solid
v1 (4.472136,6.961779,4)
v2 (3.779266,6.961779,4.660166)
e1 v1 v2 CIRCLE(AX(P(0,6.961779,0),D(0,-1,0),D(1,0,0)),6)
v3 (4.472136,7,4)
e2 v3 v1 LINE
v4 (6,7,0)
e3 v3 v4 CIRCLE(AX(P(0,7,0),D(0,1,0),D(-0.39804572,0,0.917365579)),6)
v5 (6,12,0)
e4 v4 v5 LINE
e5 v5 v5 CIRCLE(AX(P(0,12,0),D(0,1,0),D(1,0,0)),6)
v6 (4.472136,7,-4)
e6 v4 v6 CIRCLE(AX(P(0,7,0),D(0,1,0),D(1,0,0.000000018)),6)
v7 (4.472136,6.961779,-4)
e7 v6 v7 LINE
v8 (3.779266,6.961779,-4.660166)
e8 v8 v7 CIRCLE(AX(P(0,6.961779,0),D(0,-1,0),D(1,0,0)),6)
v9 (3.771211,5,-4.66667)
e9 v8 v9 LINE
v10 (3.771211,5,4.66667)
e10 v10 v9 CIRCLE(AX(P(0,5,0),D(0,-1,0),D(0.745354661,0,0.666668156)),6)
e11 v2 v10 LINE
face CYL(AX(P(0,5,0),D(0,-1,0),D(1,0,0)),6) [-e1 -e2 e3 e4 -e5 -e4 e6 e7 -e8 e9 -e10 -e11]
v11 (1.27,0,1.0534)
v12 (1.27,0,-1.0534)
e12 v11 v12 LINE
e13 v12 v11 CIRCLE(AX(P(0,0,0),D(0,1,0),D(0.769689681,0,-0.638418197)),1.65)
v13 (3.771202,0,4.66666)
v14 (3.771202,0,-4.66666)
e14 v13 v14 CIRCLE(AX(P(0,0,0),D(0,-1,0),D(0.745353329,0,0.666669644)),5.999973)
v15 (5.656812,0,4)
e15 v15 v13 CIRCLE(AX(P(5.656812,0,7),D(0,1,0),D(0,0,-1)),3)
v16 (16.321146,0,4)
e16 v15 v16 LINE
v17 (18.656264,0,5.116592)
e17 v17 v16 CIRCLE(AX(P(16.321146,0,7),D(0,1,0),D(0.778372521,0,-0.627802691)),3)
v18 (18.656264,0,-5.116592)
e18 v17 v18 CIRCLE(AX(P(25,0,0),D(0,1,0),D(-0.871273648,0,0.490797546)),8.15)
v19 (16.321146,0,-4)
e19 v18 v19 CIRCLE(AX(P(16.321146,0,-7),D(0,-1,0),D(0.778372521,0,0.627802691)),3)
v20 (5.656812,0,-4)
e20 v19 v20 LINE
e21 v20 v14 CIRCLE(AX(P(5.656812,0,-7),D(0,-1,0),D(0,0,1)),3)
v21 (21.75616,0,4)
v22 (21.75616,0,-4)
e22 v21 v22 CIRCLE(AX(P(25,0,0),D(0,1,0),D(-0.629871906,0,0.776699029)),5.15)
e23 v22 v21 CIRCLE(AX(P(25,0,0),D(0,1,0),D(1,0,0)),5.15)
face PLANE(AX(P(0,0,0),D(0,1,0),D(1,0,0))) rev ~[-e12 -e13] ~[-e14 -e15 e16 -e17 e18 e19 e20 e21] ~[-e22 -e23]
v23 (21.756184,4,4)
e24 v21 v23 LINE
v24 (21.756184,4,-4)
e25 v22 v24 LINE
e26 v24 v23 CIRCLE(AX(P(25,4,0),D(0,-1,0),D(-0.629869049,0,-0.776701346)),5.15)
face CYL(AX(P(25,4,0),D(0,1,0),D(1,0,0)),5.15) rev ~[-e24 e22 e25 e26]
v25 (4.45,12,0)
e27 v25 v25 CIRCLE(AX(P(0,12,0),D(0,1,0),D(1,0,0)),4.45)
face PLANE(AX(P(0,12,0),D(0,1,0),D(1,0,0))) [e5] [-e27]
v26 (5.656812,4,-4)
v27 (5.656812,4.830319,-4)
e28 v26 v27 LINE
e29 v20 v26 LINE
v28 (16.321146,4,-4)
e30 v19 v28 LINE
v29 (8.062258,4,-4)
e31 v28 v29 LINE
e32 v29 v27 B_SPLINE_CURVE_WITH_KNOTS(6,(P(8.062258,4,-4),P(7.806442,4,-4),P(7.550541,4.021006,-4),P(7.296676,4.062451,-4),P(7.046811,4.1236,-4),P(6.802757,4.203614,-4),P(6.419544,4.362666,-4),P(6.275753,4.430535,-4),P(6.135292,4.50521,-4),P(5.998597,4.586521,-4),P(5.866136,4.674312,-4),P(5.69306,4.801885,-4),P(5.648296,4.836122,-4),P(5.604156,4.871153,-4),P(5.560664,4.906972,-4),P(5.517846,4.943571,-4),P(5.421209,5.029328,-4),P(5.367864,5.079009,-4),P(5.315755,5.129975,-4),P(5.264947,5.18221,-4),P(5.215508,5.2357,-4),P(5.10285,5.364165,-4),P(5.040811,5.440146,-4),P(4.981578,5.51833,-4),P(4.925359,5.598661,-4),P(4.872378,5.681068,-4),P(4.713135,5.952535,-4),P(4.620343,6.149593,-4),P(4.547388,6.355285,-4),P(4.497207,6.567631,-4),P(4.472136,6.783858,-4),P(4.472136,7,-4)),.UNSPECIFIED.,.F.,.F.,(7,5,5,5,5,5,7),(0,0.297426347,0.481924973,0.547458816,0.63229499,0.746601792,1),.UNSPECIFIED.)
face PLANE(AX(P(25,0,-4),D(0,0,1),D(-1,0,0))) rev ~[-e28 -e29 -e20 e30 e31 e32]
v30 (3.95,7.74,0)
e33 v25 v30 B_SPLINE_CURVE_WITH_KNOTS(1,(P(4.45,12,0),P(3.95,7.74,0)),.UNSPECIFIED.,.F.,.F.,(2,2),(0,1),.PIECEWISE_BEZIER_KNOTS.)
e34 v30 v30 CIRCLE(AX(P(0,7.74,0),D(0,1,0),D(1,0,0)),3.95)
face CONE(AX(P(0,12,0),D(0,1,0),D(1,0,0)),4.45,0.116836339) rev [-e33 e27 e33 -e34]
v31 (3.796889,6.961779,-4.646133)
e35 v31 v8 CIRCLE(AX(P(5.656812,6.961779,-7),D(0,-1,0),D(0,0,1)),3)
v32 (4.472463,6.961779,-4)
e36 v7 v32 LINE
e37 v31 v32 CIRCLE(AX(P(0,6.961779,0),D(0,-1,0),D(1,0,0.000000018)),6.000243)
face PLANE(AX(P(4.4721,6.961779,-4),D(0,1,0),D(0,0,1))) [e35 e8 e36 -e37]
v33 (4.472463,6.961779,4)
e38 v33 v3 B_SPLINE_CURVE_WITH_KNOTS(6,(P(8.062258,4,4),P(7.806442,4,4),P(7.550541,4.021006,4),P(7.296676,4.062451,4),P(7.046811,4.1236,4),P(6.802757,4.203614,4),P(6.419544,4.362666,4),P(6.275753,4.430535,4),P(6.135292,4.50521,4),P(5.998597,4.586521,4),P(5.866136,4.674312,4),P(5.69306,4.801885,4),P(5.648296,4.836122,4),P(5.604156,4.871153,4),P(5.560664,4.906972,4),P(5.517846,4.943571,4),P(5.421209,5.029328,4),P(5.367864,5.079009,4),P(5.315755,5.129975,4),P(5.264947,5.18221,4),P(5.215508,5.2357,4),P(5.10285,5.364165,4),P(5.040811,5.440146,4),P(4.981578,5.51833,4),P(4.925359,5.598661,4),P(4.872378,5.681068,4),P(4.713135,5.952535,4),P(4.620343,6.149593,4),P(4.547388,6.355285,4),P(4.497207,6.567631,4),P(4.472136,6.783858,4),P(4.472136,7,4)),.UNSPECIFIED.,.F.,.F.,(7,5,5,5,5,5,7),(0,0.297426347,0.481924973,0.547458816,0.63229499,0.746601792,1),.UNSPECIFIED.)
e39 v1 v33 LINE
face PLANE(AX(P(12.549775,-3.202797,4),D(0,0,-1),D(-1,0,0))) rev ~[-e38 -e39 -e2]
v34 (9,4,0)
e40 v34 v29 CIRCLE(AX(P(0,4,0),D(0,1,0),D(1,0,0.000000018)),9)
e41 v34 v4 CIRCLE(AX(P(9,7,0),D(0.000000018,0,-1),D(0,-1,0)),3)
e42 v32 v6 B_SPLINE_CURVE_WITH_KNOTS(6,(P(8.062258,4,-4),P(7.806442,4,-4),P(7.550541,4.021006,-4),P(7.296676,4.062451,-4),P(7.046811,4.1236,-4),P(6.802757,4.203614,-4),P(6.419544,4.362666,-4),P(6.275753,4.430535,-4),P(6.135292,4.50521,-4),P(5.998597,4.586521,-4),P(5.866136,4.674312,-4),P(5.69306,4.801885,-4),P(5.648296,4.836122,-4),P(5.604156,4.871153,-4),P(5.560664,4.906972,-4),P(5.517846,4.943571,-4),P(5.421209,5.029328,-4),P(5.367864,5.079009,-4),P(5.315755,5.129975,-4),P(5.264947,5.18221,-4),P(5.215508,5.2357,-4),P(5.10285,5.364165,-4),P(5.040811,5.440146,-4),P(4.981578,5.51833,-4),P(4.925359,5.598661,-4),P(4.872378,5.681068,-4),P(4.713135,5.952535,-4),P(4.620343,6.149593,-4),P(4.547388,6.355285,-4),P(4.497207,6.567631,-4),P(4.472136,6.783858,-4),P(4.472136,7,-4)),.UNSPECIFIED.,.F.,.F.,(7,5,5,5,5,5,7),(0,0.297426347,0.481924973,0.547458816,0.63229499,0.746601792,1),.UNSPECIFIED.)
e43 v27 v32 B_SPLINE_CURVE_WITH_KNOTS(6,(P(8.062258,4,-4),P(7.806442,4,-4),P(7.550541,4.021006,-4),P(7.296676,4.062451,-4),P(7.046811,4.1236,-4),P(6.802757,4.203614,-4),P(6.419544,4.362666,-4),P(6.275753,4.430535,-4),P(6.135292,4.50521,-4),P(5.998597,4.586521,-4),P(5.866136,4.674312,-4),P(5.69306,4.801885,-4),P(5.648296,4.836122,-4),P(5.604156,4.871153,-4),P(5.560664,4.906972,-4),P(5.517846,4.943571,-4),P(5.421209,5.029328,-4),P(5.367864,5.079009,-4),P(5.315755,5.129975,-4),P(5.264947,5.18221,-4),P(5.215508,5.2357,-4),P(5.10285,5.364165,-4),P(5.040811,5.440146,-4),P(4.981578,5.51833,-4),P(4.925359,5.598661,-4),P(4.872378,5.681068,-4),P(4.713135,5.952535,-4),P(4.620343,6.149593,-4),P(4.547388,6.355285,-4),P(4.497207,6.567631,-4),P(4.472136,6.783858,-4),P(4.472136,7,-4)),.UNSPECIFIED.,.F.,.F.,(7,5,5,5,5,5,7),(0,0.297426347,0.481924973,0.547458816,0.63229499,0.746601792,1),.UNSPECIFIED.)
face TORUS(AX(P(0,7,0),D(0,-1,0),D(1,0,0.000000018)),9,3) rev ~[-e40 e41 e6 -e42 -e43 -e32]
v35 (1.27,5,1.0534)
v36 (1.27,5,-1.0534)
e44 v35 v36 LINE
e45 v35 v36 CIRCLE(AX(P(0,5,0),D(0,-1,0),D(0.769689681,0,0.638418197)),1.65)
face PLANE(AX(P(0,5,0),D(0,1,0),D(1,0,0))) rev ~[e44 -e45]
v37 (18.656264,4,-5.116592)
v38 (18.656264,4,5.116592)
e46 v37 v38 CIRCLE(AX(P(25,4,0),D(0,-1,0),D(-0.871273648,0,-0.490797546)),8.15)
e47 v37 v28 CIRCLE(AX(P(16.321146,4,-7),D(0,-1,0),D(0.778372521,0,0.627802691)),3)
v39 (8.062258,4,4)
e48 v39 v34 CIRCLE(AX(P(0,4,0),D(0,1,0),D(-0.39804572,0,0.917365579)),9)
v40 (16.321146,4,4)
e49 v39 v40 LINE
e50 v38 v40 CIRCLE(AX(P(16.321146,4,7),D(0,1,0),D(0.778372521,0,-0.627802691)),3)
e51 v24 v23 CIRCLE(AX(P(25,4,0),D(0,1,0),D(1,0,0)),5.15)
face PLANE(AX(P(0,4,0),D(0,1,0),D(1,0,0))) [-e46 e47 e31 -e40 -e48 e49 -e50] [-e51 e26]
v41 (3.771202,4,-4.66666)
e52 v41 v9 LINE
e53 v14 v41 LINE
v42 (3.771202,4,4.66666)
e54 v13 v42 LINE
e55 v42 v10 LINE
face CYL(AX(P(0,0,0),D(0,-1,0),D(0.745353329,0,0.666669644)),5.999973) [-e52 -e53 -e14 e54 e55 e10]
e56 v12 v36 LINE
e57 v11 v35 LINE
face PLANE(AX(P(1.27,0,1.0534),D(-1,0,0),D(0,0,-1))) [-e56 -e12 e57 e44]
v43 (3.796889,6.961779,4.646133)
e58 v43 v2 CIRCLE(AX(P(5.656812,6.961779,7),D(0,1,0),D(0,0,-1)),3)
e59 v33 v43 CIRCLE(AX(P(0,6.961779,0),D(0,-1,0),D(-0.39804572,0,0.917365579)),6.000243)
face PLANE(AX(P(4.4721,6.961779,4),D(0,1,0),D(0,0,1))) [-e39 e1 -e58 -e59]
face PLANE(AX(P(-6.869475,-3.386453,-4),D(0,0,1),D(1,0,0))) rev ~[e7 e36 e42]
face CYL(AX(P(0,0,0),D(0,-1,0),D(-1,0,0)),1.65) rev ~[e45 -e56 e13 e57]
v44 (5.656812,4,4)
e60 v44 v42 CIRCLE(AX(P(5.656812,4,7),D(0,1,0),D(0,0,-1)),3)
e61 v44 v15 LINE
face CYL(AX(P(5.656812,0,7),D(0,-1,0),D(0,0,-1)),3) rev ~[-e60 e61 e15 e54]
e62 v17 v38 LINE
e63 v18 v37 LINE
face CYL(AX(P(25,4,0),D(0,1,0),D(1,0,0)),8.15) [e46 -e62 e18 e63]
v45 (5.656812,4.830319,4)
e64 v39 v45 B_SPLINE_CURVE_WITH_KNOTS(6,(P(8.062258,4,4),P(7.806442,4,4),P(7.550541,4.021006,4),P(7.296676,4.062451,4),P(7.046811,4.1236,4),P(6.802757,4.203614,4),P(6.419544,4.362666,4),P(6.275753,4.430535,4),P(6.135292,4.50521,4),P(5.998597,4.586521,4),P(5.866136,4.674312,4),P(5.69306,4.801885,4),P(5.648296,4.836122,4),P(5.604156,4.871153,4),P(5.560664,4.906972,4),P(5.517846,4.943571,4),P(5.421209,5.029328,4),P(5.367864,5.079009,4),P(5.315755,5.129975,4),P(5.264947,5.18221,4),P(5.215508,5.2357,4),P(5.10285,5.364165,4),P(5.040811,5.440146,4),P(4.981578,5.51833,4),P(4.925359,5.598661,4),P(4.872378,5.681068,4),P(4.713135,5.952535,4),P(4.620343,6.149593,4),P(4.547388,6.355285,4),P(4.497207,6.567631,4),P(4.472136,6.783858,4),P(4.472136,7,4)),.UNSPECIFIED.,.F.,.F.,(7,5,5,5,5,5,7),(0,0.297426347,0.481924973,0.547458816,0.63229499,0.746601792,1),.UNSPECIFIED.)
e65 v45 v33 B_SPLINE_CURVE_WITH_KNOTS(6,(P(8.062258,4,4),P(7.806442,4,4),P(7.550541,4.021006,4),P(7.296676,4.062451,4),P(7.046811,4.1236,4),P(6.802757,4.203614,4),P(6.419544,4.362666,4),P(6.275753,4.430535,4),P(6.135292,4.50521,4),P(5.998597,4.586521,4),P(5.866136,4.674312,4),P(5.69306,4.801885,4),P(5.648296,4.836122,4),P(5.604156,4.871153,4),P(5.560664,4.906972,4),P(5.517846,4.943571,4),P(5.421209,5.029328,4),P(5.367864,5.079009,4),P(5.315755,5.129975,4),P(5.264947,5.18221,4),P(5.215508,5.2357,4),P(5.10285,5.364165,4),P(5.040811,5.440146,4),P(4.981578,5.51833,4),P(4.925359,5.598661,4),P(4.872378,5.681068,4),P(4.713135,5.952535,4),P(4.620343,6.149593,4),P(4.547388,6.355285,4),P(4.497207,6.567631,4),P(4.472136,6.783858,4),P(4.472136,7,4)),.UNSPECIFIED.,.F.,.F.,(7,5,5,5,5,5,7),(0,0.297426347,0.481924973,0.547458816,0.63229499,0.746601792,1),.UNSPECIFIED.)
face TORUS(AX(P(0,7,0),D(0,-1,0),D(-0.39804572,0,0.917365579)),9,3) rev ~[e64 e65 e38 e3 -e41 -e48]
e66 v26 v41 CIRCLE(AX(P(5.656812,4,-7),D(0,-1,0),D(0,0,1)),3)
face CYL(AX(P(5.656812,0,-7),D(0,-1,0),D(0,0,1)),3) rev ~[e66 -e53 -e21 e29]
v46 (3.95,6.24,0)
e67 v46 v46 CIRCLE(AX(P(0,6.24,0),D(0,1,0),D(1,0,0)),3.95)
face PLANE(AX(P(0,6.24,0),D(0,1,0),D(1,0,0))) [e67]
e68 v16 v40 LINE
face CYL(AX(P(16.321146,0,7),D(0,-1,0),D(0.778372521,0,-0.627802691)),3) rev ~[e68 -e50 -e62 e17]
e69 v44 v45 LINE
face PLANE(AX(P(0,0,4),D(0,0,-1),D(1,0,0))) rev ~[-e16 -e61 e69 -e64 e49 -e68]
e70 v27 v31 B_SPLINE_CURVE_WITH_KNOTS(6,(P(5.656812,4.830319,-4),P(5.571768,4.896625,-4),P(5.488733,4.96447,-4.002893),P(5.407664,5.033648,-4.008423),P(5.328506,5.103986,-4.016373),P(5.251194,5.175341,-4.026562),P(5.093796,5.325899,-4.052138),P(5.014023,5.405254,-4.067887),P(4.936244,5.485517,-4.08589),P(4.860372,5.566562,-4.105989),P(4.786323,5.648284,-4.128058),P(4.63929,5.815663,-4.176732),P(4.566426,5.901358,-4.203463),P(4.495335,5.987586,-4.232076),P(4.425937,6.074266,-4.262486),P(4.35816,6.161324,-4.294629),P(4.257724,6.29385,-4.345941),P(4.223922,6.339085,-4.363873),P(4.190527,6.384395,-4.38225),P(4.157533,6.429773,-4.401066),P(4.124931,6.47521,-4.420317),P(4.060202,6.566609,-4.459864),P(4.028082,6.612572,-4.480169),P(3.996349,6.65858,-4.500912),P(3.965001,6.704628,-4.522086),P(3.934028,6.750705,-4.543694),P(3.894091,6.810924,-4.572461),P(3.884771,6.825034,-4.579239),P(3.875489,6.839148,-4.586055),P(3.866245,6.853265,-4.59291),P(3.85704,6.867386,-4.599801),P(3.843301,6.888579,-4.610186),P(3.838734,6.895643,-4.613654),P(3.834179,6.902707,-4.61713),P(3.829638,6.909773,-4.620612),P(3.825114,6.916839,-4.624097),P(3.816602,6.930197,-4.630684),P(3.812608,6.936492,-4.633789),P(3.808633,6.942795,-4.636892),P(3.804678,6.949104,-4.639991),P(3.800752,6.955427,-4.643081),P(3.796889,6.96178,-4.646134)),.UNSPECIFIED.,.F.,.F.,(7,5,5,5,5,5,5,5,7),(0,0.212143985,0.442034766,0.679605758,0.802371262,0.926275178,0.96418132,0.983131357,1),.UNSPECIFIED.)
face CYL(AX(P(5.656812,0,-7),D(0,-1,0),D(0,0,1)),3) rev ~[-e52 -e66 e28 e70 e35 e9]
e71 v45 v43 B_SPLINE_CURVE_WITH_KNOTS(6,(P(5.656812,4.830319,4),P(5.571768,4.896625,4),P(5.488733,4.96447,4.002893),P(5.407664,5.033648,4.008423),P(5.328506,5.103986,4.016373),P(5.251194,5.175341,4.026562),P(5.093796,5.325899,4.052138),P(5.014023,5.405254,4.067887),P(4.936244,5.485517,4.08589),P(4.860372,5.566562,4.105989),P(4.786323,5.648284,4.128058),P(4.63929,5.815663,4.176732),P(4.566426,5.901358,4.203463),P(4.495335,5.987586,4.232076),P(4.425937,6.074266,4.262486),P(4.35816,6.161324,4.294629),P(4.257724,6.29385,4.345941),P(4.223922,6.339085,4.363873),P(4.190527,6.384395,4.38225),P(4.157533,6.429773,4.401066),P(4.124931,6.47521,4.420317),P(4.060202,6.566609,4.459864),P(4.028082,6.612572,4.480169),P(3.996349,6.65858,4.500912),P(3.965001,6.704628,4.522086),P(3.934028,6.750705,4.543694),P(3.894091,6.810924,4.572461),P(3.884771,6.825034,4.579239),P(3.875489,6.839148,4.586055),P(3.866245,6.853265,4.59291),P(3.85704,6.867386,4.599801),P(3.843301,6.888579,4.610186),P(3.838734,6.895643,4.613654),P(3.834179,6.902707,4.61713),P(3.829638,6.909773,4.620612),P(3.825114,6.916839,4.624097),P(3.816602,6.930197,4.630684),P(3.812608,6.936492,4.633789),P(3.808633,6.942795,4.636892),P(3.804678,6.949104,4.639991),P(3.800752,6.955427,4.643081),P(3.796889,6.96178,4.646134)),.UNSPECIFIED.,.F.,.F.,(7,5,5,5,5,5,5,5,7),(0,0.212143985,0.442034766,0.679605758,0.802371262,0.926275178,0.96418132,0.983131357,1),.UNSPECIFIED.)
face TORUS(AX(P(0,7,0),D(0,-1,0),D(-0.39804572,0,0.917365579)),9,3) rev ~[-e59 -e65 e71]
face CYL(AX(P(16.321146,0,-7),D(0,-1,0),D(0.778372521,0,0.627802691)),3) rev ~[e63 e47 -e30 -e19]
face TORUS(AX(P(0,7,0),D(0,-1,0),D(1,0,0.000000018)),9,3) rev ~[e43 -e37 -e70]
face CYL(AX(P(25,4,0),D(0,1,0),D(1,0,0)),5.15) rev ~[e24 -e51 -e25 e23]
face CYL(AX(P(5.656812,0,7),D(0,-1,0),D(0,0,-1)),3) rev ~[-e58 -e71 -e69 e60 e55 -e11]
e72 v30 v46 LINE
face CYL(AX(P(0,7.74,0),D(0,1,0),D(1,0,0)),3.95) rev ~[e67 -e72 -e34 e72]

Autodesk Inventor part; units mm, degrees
ref_plane "YZ Plane" through (0, 0, 0) normal (1, 0, 0) x (0, 1, 0)
ref_plane "XZ Plane" through (0, 0, 0) normal (0, 1, 0) x (-1, 0, 0)
ref_plane "XY Plane" through (0, 0, 0) normal (0, 0, 1) x (1, 0, 0)
sketch "Boceto1" plane through (0, 0, 0) normal (0, 1, 0) x (-1, 0, 0)
  circle A0 centre (0, 0) radius 4
  circle A1 centre (0, 0) radius 1.65
  line L0 (0, 4) -> (-25, 4)
  line L1 (-25, 4) -> (-25, -4)
  line L2 (-25, -4) -> (0, -4)
  line L3 (0, -4) -> (0, 4)
  circle A2 centre (-25, 0) radius 4
  circle A3 centre (-25, 0) radius 1.65
  line L4 (-1.27, 1.0534) -> (-1.27, -1.0534)
  point P0 (-25, 4)
  point P1 (0, -4)
  dimension "d1" = 8
  dimension "d0" = 3.3
  dimension "d2" = 25
  dimension "d3" = 3.3
  dimension "d4" = 1.27
extrude "Extrusión1" add sketch "Boceto1" along normal blind 5 contours A0 L3 A1 | L3 A1 A0 | A0 L2 A2 L0 | A2 L1 A3 | L1 A3 A2 | L4 A1
sketch "Boceto5" plane through (0, 5, 0) normal (0, 1, 0) x (1, 0, 0)
  circle A0 centre (0, 0) radius 6
  dimension "d12" = 12
extrude "Extrusión4" add sketch "Boceto5" along normal blind 7
sketch "Boceto8" plane through (0, 12, 0) normal (0, 1, 0) x (1, 0, 0)
  circle A0 centre (0, 0) radius 3.95
  dimension "d21" = 7.9
extrude "Extrusión5" cut sketch "Boceto8" against normal blind 4.26
sketch "Boceto9" plane through (0, 0, 0) normal (0, -1, 0) x (1, 0, 0)
  arc A0 (4.4721, 4) -> (4.4721, -4) centre (0, 0) ccw projected
  arc A1 (4.4721, -4) -> (4.4721, 4) centre (0, 0) ccw projected
  line L0 (25, -4) -> (0, -4) projected
  arc A2 (25, -4) -> (25, 4) centre (25, 0) ccw projected
  line L1 (0, 4) -> (25, 4) projected
  arc A3 (0, 4) -> (0, -4) centre (0, 0) ccw projected
  arc A4 (1.27, 1.0534) -> (1.27, -1.0534) centre (0, 0) ccw projected
  line L2 (1.27, -1.0534) -> (1.27, 1.0534) projected
  circle A5 centre (25, 0) radius 1.65 projected
  point P0 (4.4721, 4)
  point P1 (4.4721, -4)
extrude "Extrusión6" add sketch "Boceto9" against normal up to surface (5 mm away) contours L1 A3 L0 A0
sketch "Boceto10" plane through (0, 12, 0) normal (0, 1, 0) x (1, 0, 0)
  circle A0 centre (0, 0) radius 4.45
  dimension "d26" = 8.9
loft "Solevación2" cut profiles "Boceto10" section 2 edges at (-3.95, 7.74, 0)
sketch "Boceto11" plane through (0, 7.74, 0) normal (0, 1, 0) x (1, 0, 0)
  circle A0 centre (0, 0) radius 3.95 projected
extrude "Extrusión7" cut sketch "Boceto11" against normal blind 1.5
sketch "Boceto12" plane through (0, 5, 0) normal (0, 1, 0) x (1, 0, 0)
  arc A0 (4.4721, -4) -> (4.4721, 4) centre (0, 0) ccw projected
  line L0 (4.4721, -4) -> (25, -4) projected
  arc A1 (25, -4) -> (25, 4) centre (25, 0) ccw projected
  line L1 (25, 4) -> (4.4721, 4) projected
  circle A2 centre (25, 0) radius 1.65 projected
extrude "Extrusión8" cut sketch "Boceto12" against normal blind 1
sketch "Boceto14" plane through (0, 4, 0) normal (0, 1, 0) x (1, 0, 0)
  circle A0 centre (25, 0) radius 1.65 projected
  circle A1 centre (25, 0) radius 5.15
  circle A2 centre (25, 0) radius 8.15
  point P0 (0, 0)
  dimension "d36" = 10.3
  dimension "d37" = 3
extrude "Extrusión9" add sketch "Boceto14" against normal up to surface (4 mm away) contours A2
sketch "Boceto15" plane through (0, 4, 0) normal (0, 1, 0) x (1, 0, 0)
  arc A0 (21.7562, -4) -> (21.7562, 4) centre (25, 0) ccw projected
  circle A1 centre (25, 0) radius 5.15
  point P0 (0, 0)
  point P1 (21.7562, 4)
  dimension "d35" = 17.0679
extrude "Extrusión10" cut sketch "Boceto15" against normal through all
fillet "Empalme1" radius 3 5 edges at (17.8991, 2, 4) (17.8991, 2, -4) (4.4721, 2, -4) (4.4721, 2, 4) (6, 4, 0)
sketch "Boceto6" plane through (0, 12, 0) normal (0, 1, 0) x (1, 0, 0)
  circle A0 centre (0, 0) radius 4.5
  dimension "d15" = 9
sketch "Boceto7" plane through (0, 5, 0) normal (0, 1, 0) x (1, 0, 0)
  arc A0 (1.27, 1.0534) -> (1.27, -1.0534) centre (0, 0) ccw projected
  circle A1 centre (0, 0) radius 4
  dimension "d16" = 8
sketch "Boceto2" plane through (0, 5, 0) normal (0, 1, 0) x (1, 0, 0)
  line L0 (40, 3) -> (0, 3) projected
  arc A0 (0, 3) -> (0, -3) centre (0, 0) ccw projected
  line L1 (0, -3) -> (40, -3) projected
  arc A1 (40, -3) -> (40, 3) centre (40, 0) ccw projected
  arc A2 (1.27, 1.0534) -> (1.27, -1.0534) centre (0, 0) ccw projected
  line L2 (1.27, 1.0534) -> (1.27, -1.0534) projected
  circle A3 centre (40, 0) radius 1.65 projected
sketch "Boceto4" plane through (0, 6.2, 0) normal (0, 1, 0) x (1, 0, 0)
  arc A0 (1.27, 1.0534) -> (1.27, -1.0534) centre (0, 0) ccw projected
  circle A1 centre (0, 0) radius 5
  dimension "d9" = 10
properties part number "LinkA"
